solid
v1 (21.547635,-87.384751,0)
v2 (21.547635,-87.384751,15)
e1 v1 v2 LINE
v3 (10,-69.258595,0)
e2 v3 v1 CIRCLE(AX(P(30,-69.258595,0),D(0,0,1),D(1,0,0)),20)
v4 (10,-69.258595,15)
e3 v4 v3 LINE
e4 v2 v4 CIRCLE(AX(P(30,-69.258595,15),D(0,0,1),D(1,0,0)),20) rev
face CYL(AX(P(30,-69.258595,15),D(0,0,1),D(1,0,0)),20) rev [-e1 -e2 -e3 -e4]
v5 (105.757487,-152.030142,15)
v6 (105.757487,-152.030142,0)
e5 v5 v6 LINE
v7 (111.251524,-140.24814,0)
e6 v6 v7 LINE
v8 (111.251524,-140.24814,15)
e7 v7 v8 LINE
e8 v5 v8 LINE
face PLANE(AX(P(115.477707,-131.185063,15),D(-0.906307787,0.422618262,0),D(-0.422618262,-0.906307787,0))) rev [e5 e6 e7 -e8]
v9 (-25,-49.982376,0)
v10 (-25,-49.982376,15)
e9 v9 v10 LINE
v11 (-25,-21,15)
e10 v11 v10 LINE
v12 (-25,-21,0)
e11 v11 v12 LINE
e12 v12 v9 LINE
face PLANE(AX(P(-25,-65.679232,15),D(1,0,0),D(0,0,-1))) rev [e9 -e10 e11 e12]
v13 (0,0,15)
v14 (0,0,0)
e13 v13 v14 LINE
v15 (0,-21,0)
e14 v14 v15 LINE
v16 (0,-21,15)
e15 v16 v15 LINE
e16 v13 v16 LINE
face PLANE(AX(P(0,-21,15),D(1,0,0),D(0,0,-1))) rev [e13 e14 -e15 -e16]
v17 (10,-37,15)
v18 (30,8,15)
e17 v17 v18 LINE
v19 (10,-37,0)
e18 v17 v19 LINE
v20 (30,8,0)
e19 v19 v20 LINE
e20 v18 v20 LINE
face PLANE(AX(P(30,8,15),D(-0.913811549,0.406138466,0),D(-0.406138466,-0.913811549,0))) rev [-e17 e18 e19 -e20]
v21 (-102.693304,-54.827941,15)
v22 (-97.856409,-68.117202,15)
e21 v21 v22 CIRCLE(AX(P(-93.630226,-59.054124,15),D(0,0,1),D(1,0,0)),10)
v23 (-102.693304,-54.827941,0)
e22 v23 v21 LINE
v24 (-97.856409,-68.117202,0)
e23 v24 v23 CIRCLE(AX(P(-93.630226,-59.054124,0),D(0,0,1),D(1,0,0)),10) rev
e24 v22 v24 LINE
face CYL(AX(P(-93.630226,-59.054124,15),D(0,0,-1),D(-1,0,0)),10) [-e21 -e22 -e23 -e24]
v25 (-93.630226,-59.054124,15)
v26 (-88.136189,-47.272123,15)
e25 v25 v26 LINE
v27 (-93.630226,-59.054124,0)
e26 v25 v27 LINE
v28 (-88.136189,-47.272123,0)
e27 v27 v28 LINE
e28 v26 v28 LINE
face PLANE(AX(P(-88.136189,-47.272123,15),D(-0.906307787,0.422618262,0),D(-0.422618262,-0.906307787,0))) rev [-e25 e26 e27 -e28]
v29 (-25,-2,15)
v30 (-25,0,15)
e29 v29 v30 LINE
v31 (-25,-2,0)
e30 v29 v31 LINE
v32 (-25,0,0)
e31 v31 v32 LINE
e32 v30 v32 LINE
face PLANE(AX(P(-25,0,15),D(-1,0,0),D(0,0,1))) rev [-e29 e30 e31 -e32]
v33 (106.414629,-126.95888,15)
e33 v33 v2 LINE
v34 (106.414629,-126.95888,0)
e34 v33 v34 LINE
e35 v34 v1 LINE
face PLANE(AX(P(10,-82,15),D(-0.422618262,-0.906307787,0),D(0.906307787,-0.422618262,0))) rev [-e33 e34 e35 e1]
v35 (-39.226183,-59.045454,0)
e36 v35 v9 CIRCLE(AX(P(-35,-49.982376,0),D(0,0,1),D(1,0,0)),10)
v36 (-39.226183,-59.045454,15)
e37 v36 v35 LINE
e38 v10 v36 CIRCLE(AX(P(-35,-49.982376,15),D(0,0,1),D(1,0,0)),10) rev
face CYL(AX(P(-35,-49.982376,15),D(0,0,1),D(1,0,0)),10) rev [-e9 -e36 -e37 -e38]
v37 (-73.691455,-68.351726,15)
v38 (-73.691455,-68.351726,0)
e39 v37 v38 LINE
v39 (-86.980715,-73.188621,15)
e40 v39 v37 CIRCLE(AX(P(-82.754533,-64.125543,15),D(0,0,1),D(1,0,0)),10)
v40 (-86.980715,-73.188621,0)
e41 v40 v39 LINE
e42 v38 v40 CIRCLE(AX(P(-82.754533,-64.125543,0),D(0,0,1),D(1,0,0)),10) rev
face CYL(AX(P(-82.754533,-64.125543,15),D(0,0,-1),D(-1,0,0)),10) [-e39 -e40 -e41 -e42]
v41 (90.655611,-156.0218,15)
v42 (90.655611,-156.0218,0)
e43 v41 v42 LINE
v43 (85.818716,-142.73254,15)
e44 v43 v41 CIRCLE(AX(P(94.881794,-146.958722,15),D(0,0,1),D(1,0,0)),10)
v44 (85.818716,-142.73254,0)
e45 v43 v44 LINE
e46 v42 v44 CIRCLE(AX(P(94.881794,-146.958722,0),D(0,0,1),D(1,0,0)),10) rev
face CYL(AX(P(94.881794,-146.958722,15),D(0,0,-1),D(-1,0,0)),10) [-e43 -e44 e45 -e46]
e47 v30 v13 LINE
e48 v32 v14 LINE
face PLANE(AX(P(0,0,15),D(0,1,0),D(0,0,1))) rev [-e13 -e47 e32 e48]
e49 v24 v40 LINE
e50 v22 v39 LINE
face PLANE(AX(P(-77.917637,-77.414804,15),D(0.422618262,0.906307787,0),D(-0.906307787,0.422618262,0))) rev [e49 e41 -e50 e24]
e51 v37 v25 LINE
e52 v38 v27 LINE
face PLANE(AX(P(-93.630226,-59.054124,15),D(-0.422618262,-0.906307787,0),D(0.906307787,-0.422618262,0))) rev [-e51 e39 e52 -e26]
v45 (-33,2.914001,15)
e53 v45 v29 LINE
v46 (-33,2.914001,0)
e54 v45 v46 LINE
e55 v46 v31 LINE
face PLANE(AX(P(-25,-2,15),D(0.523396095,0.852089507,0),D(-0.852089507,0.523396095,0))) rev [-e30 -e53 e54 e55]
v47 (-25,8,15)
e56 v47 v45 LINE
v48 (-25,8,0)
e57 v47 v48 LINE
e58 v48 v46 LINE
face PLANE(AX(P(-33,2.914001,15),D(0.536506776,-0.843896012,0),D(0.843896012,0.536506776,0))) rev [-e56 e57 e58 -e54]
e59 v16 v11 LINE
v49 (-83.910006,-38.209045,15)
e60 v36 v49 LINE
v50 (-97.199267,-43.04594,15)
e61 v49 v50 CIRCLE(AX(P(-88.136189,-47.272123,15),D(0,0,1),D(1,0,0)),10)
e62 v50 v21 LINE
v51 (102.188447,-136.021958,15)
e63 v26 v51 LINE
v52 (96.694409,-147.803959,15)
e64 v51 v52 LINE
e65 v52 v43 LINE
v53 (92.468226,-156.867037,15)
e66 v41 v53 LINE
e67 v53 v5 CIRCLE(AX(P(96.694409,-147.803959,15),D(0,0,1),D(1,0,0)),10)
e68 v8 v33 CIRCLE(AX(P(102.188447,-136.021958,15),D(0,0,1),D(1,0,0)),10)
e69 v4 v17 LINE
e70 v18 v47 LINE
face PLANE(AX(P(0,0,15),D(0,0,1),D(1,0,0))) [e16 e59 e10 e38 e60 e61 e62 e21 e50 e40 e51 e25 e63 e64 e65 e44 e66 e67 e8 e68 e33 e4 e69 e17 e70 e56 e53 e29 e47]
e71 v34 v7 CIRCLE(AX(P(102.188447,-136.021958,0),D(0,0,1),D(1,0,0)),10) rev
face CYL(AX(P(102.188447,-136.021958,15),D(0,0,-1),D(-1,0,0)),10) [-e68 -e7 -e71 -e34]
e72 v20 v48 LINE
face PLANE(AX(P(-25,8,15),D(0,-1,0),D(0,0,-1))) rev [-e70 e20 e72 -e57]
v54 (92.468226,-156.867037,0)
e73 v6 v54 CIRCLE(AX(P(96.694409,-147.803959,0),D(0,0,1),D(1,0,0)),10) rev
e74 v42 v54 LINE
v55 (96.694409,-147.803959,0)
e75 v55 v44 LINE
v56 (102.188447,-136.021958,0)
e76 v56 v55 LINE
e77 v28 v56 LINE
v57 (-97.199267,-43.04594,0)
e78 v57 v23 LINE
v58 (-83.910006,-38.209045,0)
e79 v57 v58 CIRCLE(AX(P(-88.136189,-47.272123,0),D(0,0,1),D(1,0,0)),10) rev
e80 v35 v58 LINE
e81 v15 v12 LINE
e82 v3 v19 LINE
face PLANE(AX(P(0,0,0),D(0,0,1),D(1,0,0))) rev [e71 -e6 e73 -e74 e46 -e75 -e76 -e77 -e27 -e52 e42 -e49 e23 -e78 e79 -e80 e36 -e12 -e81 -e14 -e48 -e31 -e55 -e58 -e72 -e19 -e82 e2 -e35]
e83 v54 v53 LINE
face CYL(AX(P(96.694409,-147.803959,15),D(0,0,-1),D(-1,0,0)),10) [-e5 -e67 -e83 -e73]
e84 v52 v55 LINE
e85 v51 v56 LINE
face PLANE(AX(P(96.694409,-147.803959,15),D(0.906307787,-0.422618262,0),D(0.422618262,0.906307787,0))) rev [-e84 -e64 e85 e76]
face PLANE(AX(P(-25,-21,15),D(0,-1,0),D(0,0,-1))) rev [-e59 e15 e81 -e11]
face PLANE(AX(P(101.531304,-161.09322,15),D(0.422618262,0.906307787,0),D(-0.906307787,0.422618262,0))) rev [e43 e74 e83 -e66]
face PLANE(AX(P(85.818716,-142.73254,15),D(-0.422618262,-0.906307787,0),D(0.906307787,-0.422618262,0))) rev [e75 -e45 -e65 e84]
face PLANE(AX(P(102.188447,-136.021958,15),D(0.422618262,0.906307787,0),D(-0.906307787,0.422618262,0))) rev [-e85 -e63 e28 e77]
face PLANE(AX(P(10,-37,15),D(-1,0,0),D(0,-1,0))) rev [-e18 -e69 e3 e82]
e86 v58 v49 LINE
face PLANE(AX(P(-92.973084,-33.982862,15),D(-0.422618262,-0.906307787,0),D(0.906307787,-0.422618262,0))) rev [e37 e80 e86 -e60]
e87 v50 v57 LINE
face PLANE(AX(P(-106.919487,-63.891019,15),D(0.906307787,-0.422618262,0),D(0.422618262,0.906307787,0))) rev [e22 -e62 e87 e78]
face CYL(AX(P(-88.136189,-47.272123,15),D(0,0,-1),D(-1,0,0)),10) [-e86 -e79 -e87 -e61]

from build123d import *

# Parameters (mm, degrees)
BOSS_EXTRUDE1_DEPTH = 15
FILLET1_R           = 10
FILLET2_R           = 20


with BuildPart() as part:
    # Sketch1 → Boss-Extrude1 (new body)
    with BuildSketch(Plane.XY):
        Polygon((0, 0), (-25, 0), (-25, -2), (-33, 2.914001084), (-25, 8), (10, 8), (30, 8), (10, -37), (10, -82), (115.477706991, -131.185062534), (101.531304353, -161.093219507), (81.592533038, -151.795617748), (85.818715656, -142.732539878), (96.6944091, -147.803959019), (102.188446503, -136.021957787), (-88.136188775, -47.272122822), (-93.630226177, -59.054124053), (-73.691454863, -68.351725812), (-77.91763748, -77.414803682), (-106.919486665, -63.891019306), (-92.973084028, -33.982862334), (-25, -65.679231965), (-25, -21), (0, -21), align=None)
    extrude(amount=BOSS_EXTRUDE1_DEPTH)

    # Fillet1
    fillet1_edges = [part.edges().sort_by_distance(p)[0] for p in [
        (115.477706991, -131.185062534, 7.5),
        (101.531304353, -161.093219507, 7.5),
        (81.592533038, -151.795617748, 7.5),
        (-77.91763748, -77.414803682, 7.5),
        (-106.919486665, -63.891019306, 7.5),
        (-92.973084028, -33.982862334, 7.5),
        (-25, -65.679231965, 7.5),
    ]]
    fillet(fillet1_edges, radius=FILLET1_R - 0.0001)  # a hair under: the kernel refuses the full size

    # Fillet2
    fillet2_edges = [part.edges().sort_by_distance(p)[0] for p in [
        (10, -82, 7.5),
    ]]
    fillet(fillet2_edges, radius=FILLET2_R)


solid = part.part
